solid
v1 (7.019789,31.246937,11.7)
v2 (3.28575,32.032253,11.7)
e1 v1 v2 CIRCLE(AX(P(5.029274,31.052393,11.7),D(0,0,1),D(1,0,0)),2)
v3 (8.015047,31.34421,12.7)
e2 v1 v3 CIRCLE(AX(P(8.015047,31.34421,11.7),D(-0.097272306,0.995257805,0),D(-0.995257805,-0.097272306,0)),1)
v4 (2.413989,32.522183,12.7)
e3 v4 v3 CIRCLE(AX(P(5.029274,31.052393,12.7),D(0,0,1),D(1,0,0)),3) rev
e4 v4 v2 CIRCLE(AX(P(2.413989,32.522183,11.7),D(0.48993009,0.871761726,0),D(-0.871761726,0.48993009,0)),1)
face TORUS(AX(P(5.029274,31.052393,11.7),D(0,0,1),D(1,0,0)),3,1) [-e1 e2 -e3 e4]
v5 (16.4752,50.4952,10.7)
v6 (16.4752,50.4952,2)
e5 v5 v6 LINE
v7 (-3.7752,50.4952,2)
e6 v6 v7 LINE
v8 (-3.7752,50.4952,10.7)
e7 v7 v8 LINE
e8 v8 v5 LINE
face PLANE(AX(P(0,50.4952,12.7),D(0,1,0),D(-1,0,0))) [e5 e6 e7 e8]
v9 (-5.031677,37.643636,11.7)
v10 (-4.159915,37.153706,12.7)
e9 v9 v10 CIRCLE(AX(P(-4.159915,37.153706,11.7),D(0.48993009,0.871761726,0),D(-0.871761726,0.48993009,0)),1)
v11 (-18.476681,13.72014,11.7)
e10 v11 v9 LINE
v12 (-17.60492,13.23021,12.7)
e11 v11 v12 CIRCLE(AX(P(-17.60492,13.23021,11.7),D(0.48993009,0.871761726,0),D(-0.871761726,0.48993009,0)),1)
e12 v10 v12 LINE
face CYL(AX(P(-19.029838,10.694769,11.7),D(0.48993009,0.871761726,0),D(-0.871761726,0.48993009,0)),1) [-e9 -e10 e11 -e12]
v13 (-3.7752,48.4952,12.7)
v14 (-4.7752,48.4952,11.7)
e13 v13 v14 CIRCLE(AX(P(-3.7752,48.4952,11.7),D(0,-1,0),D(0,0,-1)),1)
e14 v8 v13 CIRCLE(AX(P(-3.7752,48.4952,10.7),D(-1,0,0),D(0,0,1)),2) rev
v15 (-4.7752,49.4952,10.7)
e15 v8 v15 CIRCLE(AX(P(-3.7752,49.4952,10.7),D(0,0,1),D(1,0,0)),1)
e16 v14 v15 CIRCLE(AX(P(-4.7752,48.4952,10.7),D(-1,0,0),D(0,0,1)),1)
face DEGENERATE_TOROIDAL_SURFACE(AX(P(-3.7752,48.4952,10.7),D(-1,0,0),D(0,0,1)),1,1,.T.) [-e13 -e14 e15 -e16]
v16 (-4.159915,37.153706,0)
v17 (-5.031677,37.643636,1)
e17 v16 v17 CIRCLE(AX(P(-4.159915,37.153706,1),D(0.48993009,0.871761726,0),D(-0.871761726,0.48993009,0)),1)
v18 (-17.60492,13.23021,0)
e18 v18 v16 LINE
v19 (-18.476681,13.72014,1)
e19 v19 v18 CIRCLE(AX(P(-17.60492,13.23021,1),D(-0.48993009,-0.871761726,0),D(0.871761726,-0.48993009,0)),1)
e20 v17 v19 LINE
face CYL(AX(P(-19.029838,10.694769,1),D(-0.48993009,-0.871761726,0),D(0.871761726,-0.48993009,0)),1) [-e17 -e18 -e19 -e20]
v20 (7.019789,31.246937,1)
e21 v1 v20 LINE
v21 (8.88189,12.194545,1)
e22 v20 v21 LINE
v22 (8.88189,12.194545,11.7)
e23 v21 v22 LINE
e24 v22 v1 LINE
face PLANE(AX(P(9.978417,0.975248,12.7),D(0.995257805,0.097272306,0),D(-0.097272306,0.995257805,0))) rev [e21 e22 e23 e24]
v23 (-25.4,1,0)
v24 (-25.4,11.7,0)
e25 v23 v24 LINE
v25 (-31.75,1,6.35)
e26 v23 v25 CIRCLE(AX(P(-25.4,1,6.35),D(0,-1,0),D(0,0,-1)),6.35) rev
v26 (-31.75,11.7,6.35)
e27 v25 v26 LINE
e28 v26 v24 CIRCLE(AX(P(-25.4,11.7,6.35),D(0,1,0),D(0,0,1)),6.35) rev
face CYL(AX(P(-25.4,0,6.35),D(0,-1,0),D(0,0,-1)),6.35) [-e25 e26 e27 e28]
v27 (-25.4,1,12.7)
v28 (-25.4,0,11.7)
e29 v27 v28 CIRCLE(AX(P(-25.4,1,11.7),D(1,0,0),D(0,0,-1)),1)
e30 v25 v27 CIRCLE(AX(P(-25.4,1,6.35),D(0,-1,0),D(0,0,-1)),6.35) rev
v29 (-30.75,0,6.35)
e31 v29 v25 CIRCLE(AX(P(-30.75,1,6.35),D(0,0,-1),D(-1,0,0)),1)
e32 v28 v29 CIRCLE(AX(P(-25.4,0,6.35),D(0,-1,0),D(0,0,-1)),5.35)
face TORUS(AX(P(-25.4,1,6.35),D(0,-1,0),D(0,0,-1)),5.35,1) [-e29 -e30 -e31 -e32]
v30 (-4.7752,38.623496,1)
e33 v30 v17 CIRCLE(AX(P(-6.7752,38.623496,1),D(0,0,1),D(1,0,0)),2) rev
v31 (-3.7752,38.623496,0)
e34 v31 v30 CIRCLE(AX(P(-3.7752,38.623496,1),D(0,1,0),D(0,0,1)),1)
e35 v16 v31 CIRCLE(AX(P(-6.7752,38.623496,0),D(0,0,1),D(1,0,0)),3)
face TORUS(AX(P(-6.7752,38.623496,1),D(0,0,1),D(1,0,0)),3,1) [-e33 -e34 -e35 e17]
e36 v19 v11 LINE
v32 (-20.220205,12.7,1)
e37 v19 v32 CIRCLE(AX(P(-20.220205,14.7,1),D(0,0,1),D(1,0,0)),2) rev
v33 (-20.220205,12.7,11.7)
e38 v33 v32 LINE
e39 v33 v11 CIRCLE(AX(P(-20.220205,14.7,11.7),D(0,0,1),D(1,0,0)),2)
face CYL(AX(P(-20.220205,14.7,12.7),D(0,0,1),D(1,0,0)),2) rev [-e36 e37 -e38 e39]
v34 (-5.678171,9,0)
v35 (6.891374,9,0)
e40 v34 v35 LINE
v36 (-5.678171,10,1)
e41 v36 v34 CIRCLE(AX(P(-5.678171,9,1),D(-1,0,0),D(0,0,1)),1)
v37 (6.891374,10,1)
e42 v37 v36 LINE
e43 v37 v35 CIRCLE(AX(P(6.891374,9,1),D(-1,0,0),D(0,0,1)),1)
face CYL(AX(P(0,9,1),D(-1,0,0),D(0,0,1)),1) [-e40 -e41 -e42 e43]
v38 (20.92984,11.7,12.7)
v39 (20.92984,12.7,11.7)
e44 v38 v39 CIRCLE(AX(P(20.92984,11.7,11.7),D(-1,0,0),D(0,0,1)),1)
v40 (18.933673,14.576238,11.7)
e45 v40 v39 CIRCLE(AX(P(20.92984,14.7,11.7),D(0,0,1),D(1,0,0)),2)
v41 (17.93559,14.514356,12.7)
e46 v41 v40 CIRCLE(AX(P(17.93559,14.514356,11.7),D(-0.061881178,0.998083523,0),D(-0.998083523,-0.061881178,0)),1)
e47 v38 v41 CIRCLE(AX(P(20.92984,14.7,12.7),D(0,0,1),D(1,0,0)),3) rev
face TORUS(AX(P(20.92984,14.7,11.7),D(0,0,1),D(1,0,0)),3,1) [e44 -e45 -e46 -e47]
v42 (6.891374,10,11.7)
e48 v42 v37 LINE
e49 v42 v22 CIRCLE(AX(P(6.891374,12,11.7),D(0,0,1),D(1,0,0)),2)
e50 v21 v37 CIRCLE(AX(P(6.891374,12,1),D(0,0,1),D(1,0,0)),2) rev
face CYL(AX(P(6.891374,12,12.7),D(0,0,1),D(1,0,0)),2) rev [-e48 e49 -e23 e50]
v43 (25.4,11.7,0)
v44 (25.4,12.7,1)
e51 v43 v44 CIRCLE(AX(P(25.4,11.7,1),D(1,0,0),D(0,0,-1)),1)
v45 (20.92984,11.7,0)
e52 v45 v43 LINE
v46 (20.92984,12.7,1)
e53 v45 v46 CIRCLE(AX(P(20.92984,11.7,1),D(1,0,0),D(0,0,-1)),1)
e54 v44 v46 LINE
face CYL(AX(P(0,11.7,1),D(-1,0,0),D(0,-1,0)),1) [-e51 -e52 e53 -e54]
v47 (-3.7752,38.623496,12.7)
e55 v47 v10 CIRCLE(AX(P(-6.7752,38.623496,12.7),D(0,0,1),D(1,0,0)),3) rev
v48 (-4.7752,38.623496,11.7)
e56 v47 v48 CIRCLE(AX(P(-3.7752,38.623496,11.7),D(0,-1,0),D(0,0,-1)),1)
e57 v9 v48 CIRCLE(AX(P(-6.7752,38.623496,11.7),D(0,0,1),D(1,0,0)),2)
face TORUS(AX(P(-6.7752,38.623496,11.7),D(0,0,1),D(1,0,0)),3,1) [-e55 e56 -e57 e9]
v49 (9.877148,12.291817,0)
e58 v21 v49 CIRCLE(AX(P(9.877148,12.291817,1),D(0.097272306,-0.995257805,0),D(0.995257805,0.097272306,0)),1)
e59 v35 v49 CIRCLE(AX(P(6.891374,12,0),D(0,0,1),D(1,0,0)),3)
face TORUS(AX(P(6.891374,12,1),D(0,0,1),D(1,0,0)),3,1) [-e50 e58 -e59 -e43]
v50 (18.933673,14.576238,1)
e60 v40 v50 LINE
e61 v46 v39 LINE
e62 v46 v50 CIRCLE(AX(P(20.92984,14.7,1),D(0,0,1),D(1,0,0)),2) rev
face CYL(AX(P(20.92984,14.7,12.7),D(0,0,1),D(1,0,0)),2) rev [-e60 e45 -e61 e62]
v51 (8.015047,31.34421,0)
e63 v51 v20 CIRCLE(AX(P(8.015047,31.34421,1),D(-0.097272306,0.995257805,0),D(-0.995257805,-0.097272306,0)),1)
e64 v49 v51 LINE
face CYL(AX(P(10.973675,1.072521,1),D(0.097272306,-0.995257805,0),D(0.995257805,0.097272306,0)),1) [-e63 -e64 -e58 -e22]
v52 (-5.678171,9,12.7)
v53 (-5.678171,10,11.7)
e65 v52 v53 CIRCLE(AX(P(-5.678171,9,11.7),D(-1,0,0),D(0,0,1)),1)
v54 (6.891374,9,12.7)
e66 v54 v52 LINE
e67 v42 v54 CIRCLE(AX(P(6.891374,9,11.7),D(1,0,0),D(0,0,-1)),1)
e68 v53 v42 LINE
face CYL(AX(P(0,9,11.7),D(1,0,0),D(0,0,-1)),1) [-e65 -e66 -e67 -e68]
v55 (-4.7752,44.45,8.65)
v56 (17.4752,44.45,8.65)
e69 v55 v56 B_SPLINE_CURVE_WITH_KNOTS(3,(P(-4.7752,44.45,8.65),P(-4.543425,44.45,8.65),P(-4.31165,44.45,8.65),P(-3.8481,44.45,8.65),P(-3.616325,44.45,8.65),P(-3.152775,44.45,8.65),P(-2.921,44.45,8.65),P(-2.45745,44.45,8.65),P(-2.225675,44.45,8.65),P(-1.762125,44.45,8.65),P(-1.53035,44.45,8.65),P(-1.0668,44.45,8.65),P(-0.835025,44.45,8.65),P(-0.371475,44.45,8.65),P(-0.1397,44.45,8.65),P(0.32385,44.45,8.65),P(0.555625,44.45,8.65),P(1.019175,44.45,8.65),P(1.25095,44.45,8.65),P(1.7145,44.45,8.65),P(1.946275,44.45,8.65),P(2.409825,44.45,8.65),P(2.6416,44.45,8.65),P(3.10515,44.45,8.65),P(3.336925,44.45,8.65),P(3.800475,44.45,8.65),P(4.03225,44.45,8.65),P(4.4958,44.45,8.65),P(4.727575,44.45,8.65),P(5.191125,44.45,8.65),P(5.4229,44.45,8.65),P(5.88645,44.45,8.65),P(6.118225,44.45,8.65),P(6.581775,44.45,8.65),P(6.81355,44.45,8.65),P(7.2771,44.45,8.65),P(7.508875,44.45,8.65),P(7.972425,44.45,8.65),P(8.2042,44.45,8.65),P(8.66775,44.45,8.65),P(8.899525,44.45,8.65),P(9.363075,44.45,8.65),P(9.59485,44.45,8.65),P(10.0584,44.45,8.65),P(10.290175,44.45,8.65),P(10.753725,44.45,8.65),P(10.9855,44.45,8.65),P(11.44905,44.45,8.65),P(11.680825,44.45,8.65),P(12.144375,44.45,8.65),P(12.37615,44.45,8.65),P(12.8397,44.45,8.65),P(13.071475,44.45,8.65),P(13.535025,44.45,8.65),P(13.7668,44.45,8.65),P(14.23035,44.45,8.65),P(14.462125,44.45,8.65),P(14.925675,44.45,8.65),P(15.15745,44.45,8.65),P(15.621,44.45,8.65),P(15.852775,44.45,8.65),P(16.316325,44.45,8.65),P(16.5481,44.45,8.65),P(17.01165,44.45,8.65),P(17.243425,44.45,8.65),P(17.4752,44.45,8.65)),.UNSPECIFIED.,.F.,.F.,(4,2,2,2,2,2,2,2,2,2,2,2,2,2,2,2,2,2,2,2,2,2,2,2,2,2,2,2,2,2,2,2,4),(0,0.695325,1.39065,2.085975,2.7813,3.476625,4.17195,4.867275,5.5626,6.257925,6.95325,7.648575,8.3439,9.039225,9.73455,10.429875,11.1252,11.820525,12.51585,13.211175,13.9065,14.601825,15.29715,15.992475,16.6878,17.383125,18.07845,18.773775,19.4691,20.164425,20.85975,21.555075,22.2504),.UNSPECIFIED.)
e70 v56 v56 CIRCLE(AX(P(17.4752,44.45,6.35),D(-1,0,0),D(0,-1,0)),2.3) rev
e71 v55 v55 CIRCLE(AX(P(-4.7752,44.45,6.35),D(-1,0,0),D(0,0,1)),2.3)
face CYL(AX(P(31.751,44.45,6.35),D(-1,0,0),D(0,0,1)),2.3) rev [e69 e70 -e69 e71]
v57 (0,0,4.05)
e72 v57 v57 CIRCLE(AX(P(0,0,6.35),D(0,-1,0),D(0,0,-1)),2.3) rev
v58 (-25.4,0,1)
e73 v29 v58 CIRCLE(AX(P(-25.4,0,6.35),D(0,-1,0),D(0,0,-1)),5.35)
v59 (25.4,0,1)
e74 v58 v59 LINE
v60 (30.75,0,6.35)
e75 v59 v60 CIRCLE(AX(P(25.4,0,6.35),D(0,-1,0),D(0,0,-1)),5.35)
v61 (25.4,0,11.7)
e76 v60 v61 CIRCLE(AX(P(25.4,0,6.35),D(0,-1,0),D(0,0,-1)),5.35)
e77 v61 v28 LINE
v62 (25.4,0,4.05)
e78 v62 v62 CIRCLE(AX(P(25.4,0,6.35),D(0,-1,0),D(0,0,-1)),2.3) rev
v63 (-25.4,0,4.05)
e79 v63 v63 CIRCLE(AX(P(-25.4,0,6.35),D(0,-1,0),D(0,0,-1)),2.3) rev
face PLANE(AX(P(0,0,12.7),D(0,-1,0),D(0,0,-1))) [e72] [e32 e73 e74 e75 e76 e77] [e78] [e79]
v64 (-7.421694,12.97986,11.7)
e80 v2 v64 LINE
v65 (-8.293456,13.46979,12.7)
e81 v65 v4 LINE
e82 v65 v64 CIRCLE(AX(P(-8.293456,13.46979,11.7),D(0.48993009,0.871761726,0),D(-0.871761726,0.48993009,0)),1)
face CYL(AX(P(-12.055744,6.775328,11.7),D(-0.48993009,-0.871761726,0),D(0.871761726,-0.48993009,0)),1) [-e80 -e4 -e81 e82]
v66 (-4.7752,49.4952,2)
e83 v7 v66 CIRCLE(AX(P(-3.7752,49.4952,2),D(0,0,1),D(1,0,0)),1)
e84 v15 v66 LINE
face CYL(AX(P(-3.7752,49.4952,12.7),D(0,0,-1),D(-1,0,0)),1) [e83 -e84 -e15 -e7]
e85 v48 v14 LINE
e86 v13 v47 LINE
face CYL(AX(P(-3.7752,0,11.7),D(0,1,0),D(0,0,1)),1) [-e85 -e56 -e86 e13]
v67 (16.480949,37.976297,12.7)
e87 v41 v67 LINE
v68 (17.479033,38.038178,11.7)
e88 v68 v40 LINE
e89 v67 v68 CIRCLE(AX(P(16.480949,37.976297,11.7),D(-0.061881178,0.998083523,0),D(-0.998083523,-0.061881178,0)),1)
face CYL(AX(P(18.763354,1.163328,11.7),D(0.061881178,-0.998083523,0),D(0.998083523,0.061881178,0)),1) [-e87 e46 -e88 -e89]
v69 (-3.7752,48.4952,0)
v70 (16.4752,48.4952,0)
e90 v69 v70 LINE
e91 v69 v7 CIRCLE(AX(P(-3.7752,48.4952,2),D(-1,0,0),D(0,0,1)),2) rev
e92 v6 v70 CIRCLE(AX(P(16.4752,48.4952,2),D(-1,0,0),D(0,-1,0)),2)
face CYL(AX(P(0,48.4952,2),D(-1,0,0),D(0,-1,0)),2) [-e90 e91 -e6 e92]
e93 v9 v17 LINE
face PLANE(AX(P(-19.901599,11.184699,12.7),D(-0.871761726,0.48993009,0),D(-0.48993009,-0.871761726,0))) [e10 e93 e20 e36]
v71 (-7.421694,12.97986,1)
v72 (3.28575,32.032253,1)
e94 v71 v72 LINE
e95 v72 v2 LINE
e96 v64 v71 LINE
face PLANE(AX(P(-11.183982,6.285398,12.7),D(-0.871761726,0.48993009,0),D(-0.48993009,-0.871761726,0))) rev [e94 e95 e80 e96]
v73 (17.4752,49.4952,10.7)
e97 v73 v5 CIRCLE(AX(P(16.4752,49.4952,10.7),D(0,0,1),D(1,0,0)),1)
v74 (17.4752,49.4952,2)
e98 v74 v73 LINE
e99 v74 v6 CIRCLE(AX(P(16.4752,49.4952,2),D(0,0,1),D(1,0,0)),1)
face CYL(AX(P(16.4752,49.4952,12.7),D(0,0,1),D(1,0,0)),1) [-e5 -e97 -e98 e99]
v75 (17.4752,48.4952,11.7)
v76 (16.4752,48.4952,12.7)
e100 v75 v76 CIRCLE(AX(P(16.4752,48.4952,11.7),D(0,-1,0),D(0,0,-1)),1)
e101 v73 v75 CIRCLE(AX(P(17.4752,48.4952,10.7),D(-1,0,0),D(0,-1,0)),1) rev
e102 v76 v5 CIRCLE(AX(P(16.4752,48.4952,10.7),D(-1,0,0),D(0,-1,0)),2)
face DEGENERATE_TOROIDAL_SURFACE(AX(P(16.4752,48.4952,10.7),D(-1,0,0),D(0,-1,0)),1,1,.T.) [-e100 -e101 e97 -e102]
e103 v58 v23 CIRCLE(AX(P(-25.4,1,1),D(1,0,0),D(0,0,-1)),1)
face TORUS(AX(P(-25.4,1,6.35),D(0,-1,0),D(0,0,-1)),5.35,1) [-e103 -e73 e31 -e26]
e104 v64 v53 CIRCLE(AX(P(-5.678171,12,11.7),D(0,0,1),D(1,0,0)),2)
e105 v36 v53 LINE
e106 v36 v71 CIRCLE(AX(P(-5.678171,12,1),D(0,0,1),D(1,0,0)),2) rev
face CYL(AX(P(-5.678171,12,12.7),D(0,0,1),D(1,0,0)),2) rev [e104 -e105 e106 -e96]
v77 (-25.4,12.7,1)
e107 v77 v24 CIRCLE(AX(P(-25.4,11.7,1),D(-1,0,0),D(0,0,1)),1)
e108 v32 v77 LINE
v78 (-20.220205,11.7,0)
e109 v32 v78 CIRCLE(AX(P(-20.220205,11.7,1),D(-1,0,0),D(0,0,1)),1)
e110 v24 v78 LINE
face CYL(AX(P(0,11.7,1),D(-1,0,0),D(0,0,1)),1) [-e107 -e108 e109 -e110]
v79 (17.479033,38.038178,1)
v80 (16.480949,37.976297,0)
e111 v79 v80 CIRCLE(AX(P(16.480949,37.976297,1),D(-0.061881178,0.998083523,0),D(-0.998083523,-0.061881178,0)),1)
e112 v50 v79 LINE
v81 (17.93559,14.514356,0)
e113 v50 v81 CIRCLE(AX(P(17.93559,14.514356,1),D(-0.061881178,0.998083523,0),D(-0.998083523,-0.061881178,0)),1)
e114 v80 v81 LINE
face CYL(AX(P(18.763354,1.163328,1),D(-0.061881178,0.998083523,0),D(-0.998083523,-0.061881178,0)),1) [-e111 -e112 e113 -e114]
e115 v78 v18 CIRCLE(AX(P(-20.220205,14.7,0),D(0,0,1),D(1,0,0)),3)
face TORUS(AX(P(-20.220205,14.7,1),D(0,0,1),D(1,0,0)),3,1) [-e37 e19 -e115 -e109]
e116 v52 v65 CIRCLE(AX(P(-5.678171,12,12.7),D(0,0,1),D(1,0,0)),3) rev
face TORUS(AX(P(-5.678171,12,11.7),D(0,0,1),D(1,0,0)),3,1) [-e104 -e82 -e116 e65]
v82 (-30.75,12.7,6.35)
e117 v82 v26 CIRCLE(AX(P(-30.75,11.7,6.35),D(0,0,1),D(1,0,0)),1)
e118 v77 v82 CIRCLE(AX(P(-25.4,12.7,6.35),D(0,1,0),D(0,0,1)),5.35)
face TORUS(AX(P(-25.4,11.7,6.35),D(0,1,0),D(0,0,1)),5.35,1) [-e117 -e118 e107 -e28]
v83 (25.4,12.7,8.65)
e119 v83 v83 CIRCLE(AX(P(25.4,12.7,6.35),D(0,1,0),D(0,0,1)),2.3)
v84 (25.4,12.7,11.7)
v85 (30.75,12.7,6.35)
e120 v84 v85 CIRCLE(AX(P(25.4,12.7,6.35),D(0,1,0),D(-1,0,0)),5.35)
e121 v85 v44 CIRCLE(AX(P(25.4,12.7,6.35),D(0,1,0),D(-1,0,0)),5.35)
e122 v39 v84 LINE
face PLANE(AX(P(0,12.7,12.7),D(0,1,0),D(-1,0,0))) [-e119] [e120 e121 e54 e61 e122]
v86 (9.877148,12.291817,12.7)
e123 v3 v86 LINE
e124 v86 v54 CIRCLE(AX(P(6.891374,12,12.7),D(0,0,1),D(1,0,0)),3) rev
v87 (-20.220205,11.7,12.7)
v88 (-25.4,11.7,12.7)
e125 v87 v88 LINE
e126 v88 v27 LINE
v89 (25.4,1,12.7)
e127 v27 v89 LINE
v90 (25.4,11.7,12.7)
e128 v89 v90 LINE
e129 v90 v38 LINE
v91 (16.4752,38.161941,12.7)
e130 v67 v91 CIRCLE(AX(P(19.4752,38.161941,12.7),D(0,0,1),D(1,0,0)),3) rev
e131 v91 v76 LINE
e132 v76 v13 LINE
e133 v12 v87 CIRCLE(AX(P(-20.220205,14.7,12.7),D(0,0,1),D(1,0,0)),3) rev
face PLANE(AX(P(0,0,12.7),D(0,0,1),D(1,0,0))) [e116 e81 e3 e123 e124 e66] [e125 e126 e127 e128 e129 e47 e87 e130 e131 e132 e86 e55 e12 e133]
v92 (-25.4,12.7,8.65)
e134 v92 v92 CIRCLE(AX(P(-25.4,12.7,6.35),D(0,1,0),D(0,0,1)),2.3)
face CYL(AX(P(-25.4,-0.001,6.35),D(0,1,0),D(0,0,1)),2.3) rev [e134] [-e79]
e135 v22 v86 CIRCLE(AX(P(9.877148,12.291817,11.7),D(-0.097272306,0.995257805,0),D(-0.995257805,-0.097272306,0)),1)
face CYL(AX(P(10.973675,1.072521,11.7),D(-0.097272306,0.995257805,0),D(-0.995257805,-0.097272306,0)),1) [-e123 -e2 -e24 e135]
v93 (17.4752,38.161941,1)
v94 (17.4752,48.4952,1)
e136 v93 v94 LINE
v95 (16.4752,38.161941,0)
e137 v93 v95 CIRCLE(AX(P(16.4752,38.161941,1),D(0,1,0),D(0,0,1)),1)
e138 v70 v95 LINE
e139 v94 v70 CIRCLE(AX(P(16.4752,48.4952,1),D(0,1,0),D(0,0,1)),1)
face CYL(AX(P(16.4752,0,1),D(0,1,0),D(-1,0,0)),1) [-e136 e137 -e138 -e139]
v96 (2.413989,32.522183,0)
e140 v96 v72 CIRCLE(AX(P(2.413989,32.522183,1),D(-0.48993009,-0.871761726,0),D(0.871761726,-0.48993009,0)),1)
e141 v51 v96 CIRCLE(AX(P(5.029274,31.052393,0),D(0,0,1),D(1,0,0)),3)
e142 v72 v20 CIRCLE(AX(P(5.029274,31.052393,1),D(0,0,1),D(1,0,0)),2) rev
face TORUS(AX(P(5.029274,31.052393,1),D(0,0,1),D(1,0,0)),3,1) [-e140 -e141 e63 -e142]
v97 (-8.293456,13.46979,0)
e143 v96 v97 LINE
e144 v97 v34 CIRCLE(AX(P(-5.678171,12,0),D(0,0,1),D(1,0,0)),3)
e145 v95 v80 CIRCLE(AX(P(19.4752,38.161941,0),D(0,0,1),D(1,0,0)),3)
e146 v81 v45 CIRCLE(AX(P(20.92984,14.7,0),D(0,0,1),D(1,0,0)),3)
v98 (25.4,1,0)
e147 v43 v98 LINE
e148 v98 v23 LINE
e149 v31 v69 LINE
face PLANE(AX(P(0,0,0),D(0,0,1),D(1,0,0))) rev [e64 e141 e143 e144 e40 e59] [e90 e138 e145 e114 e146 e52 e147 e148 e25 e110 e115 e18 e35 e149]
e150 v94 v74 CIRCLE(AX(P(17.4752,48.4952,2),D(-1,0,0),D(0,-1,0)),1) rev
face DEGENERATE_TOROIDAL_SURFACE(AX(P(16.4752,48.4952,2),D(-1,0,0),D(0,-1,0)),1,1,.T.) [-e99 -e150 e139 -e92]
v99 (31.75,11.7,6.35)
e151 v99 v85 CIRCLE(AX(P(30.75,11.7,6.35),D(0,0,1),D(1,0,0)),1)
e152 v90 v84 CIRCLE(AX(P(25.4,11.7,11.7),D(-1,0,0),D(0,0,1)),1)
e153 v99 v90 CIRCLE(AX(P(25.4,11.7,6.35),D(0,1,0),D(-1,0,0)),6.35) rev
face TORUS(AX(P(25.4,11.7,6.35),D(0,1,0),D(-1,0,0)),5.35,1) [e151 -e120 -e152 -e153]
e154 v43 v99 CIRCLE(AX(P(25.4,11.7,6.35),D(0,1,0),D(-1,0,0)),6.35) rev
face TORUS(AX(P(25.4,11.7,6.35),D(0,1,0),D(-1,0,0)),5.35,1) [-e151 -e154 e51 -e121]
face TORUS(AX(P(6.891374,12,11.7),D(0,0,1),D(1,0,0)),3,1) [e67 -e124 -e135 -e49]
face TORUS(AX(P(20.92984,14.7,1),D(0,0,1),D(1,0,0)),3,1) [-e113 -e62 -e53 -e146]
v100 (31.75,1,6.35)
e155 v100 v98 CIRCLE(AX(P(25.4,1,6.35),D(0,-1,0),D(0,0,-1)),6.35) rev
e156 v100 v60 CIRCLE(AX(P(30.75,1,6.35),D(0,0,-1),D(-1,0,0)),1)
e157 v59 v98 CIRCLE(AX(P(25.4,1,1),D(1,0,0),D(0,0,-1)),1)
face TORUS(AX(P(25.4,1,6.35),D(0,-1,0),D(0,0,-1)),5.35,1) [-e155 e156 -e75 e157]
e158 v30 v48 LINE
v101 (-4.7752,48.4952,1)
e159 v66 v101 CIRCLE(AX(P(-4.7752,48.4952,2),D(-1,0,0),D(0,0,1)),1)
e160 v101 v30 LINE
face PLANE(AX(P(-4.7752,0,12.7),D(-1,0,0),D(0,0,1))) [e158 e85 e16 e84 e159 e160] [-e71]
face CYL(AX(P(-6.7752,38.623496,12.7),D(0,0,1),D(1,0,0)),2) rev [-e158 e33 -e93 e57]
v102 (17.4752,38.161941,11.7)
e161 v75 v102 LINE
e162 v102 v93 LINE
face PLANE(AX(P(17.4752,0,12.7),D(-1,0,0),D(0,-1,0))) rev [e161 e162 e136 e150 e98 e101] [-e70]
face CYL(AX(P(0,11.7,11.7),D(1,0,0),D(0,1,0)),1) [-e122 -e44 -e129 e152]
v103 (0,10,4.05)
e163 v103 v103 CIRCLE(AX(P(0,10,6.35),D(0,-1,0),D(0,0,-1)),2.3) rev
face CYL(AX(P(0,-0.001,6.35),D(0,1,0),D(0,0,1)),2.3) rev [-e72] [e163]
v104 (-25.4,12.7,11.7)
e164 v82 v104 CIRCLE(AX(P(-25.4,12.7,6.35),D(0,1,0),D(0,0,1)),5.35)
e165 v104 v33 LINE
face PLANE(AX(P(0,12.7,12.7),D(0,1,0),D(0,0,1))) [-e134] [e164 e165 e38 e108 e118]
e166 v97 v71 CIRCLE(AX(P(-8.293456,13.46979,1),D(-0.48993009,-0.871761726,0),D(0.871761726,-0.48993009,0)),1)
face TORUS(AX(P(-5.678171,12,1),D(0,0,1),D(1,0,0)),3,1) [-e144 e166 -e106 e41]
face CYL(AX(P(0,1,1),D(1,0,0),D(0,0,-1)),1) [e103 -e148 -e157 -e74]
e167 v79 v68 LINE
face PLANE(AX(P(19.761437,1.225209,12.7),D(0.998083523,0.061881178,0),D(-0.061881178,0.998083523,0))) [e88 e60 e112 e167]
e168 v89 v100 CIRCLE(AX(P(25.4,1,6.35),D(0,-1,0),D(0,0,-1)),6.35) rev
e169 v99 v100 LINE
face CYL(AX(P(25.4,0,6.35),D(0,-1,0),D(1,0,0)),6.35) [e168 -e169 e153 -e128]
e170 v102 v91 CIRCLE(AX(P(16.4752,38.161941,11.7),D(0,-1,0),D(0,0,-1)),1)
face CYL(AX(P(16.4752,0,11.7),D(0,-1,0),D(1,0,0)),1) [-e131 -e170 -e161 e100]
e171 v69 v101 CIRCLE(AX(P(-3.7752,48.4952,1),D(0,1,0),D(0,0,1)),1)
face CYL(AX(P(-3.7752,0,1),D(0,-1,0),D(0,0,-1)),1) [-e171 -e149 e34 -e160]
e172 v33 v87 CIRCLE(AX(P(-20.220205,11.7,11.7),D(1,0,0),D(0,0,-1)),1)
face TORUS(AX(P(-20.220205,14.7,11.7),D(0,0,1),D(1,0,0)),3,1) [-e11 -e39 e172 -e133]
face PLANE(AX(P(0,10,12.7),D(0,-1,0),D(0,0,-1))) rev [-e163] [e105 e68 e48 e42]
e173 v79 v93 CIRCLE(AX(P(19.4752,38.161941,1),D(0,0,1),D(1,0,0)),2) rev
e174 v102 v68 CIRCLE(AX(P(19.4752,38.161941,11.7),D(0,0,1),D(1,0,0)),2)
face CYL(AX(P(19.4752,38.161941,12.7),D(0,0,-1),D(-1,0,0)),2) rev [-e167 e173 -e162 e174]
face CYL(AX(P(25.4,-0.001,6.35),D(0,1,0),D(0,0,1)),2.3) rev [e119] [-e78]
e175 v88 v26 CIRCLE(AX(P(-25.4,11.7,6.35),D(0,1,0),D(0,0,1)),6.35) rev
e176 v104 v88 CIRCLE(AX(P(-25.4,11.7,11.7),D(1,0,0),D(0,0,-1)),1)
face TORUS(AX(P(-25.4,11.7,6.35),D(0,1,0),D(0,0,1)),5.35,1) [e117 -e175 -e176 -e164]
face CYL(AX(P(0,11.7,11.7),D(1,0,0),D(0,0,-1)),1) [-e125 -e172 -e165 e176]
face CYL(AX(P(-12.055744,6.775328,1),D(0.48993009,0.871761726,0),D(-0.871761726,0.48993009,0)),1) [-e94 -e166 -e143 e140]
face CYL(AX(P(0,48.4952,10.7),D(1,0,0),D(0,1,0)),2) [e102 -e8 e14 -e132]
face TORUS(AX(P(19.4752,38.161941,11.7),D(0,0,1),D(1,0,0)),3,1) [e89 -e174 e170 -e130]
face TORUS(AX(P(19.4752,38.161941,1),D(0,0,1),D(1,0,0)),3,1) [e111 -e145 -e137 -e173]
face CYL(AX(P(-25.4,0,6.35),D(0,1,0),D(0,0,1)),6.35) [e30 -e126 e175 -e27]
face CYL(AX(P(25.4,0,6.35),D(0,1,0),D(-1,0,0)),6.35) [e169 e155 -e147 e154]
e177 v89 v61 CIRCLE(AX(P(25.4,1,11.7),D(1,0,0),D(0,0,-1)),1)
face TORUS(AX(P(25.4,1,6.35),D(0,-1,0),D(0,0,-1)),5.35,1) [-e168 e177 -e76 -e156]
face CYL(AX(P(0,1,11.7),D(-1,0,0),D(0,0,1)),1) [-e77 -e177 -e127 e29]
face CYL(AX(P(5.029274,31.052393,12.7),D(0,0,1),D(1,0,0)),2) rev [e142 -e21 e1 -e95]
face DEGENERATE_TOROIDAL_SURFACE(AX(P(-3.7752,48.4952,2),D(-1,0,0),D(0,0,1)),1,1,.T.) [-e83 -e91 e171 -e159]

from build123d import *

# Parameters (mm, degrees)
SKETCH1_W           = 6.35
SKETCH1_H           = 12.7
SKETCH1_W_2         = 22.2504
SKETCH1_H_2         = 12.3952
BOSS_EXTRUDE1_DEPTH = 12.7
CUT_EXTRUDE1_REACH  = 52.969
SKETCH2_R           = 2.3
CUT_EXTRUDE2_REACH  = 65.601
SKETCH3_R           = 2.3
FILLET1_R           = 6.35
FILLET2_R           = 2
FILLET3_R           = 1


# Some blends are built 0.0001 mm under size
with BuildPart() as part:
    # Sketch1 → Boss-Extrude1 (new body)
    # profile 1 of 3: a face of its own
    with BuildSketch(Plane.XY):
        Polygon((-31.75, 0), (25.4, 0), (25.4, 12.7), (19.05, 12.7), (17.4752, 38.1), (-4.7752, 38.1), (-19.05, 12.7), (-31.75, 12.7), align=None)
        Polygon((9.096375634, 10), (-9.096375634, 10), (6.401231747, 37.575813845), align=None, mode=Mode.SUBTRACT)
    # profile 2 of 3: a face of its own
    with BuildSketch(Plane.XY):
        with Locations((28.575, 6.35)):
            Rectangle(SKETCH1_W, SKETCH1_H)
    # profile 3 of 3: a face of its own
    with BuildSketch(Plane.XY):
        with Locations((6.35, 44.2976)):
            Rectangle(SKETCH1_W_2, SKETCH1_H_2)
    extrude(amount=BOSS_EXTRUDE1_DEPTH)

    # Sketch2 → Cut-Extrude1 (cut, up to next)
    with BuildSketch(Plane(origin=(0, 12.7, 0), x_dir=(1, 0, 0), z_dir=(0, 1, 0)), mode=Mode.PRIVATE) as cut_extrude1_sk1:
        with Locations(Location((-25.4, -6.35, 0), (0, 0, 270))):
            Circle(SKETCH2_R)
    cut_extrude1_tool1 = extrude(cut_extrude1_sk1.sketch, amount=-CUT_EXTRUDE1_REACH, mode=Mode.PRIVATE) & part.part
    # Sketch2 → Cut-Extrude1 (cut, up to next)
    with BuildSketch(Plane(origin=(0, 12.7, 0), x_dir=(1, 0, 0), z_dir=(0, 1, 0)), mode=Mode.PRIVATE) as cut_extrude1_sk2:
        with Locations(Location((25.4, -6.35, 0), (0, 0, 270))):
            Circle(SKETCH2_R)
    cut_extrude1_tool2 = extrude(cut_extrude1_sk2.sketch, amount=-CUT_EXTRUDE1_REACH, mode=Mode.PRIVATE) & part.part
    # Sketch2 → Cut-Extrude1 (cut, up to next)
    with BuildSketch(Plane(origin=(0, 12.7, 0), x_dir=(1, 0, 0), z_dir=(0, 1, 0)), mode=Mode.PRIVATE) as cut_extrude1_sk3:
        with Locations(Location((0, -6.35, 0), (0, 0, 90))):
            Circle(SKETCH2_R)
    cut_extrude1_tool3 = extrude(cut_extrude1_sk3.sketch, amount=-CUT_EXTRUDE1_REACH, mode=Mode.PRIVATE) & part.part
    add(cut_extrude1_tool1.solids().sort_by_distance((-25.4, 12.7, 6.35))[0], mode=Mode.SUBTRACT)
    add(cut_extrude1_tool2.solids().sort_by_distance((25.4, 12.7, 6.35))[0], mode=Mode.SUBTRACT)
    add(cut_extrude1_tool3.solids().sort_by_distance((0, 12.7, 6.35))[0], mode=Mode.SUBTRACT)

    # Sketch3 → Cut-Extrude2 (cut, up to next)
    with BuildSketch(Plane.ZY.offset(4.7752), mode=Mode.PRIVATE) as cut_extrude2_sk1:
        with Locations((6.35, 44.45)):
            Circle(SKETCH3_R)
    cut_extrude2_tool1 = extrude(cut_extrude2_sk1.sketch, amount=-CUT_EXTRUDE2_REACH, mode=Mode.PRIVATE) & part.part
    add(cut_extrude2_tool1.solids().sort_by_distance((-4.7752, 44.45, 6.35))[0], mode=Mode.SUBTRACT)

    # Fillet1
    fillet1_edges = [part.edges().sort_by_distance(p)[0] for p in [
        (31.75, 6.35, 0),
        (31.75, 6.35, 12.7),
        (-31.75, 6.35, 0),
        (-31.75, 6.35, 12.7),
    ]]
    fillet(fillet1_edges, radius=FILLET1_R - 0.0001)  # a hair under: the kernel refuses the full size

    # Fillet2
    fillet2_edges = [part.edges().sort_by_distance(p)[0] for p in [
        (6.35, 50.4952, 0),
        (6.401231747, 37.575813845, 6.35),
        (-9.096375634, 10, 6.35),
        (9.096375634, 10, 6.35),
        (-19.05, 12.7, 6.35),
        (-4.7752, 38.1, 6.35),
        (17.4752, 38.1, 6.35),
        (19.05, 12.7, 6.35),
        (6.35, 50.4952, 12.7),
    ]]
    fillet(fillet2_edges, radius=FILLET2_R)

    # Fillet3
    # the kernel refuses this fillet: 1 mm, written as the material it adds along each edge
    with BuildSketch(Plane(origin=(17.4752, 38.1, 0), x_dir=(0, 1, 0), z_dir=(0, 0, 1))) as fillet3_piece_1:
        with BuildLine():
            CenterArc((FILLET3_R * 0.0309702661211, -FILLET3_R), FILLET3_R, 90, 3.54779707)
            Line((-FILLET3_R * 0.0309109123319, -FILLET3_R * 0.00191647656458), (0, 0))
            Line((0, 0), (FILLET3_R * 0.0309702661211, 0))
        make_face()
    extrude(amount=12.7)
    # the kernel refuses this fillet: 1 mm, written as the material it takes off along each edge
    with BuildSketch(Plane(origin=(-20.220204873, 12.7, 0), x_dir=(0, -1, 0), z_dir=(-1, 0, 0)), Plane(origin=(-20.220204873, 12.7, 12.7), x_dir=(0, 0, -1), z_dir=(-1, 0, 0))) as fillet3_2_piece_1:
        with BuildLine():
            CenterArc((FILLET3_R, FILLET3_R), FILLET3_R, 180, 90)
            Line((0, FILLET3_R), (0, 0))
            Line((0, 0), (FILLET3_R, 0))
        make_face()
    extrude(amount=5.179895127, mode=Mode.SUBTRACT)
    with BuildSketch(Plane(origin=(-20.220204873, 14.7, 0), x_dir=(0, -1, 0), z_dir=(-1, 0, 0))) as fillet3_2_piece_2:
        with BuildLine():
            CenterArc((2 + FILLET3_R, FILLET3_R), FILLET3_R, 180, 90)
            Line((2, FILLET3_R), (2, 0))
            Line((2, 0), (2 + FILLET3_R, 0))
        make_face()
    revolve(axis=Axis((-20.220204873, 14.7, 0), (0, 0, 1)), revolution_arc=60.664013302, mode=Mode.SUBTRACT)
    with BuildSketch(Plane(origin=(-5.031676548, 37.643636036, 0), x_dir=(0.8717617259923001, -0.48993009000767246, 0), z_dir=(-0.48993009000767246, -0.8717617259923001, 0)), Plane(origin=(-5.031676548, 37.643636036, 12.7), x_dir=(0, 0, -1), z_dir=(-0.48993009000767246, -0.8717617259923001, 0))) as fillet3_2_piece_3:
        with BuildLine():
            CenterArc((FILLET3_R, FILLET3_R), FILLET3_R, 180, 90)
            Line((0, FILLET3_R), (0, 0))
            Line((0, 0), (FILLET3_R, 0))
        make_face()
    extrude(amount=27.4427008, mode=Mode.SUBTRACT)
    with BuildSketch(Plane(origin=(-25.4001, 0, 0), x_dir=(0, 1, 0), z_dir=(1, 0, 0))) as fillet3_2_piece_4:
        with BuildLine():
            CenterArc((FILLET3_R, FILLET3_R), FILLET3_R, 180, 90)
            Line((0, FILLET3_R), (0, 0))
            Line((0, 0), (FILLET3_R, 0))
        make_face()
    extrude(amount=50.8002, mode=Mode.SUBTRACT)
    with BuildSketch(Plane(origin=(-6.7752, 38.623496216, 0), x_dir=(0.8717617259923004, -0.4899300900076718, 0), z_dir=(-0.4899300900076718, -0.8717617259923004, 0))) as fillet3_2_piece_5:
        with BuildLine():
            CenterArc((2 + FILLET3_R, FILLET3_R), FILLET3_R, 180, 90)
            Line((2, FILLET3_R), (2, 0))
            Line((2, 0), (2 + FILLET3_R, 0))
        make_face()
    revolve(axis=Axis((-6.7752, 38.623496216, 0), (0, 0, 1)), revolution_arc=29.335986698, mode=Mode.SUBTRACT)
    with BuildSketch(Plane(origin=(-4.7752, 48.4952, 0), x_dir=(1, 0, 0), z_dir=(0, -1, 0)), Plane(origin=(-4.7752, 48.4952, 12.7), x_dir=(0, 0, -1), z_dir=(0, -1, 0))) as fillet3_2_piece_6:
        with BuildLine():
            CenterArc((FILLET3_R, FILLET3_R), FILLET3_R, 180, 90)
            Line((0, FILLET3_R), (0, 0))
            Line((0, 0), (FILLET3_R, 0))
        make_face()
    extrude(amount=9.871703784, mode=Mode.SUBTRACT)
    with BuildSketch(Plane(origin=(6.891374478, 10, 0), x_dir=(0, -1, 0), z_dir=(-1, 0, 0)), Plane(origin=(6.891374478, 10, 12.7), x_dir=(0, 0, -1), z_dir=(-1, 0, 0))) as fillet3_2_piece_7:
        with BuildLine():
            CenterArc((FILLET3_R, FILLET3_R), FILLET3_R, 180, 90)
            Line((0, FILLET3_R), (0, 0))
            Line((0, 0), (FILLET3_R, 0))
        make_face()
    extrude(amount=12.569545239, mode=Mode.SUBTRACT)
    with BuildSketch(Plane(origin=(6.891374478, 12, 0), x_dir=(0, -1, 0), z_dir=(-1, 0, 0))) as fillet3_2_piece_8:
        with BuildLine():
            CenterArc((2 + FILLET3_R, FILLET3_R), FILLET3_R, 180, 90)
            Line((2, FILLET3_R), (2, 0))
            Line((2, 0), (2 + FILLET3_R, 0))
        make_face()
    revolve(axis=Axis((6.891374478, 12, 0), (0, 0, 1)), revolution_arc=95.582119196, mode=Mode.SUBTRACT)
    with BuildSketch(Plane(origin=(-5.678170761, 12, 0), x_dir=(0, -1, 0), z_dir=(1, 0, 0))) as fillet3_2_piece_9:
        with BuildLine():
            CenterArc((2 + FILLET3_R, -FILLET3_R), FILLET3_R, 90, 90)
            Line((2, -FILLET3_R), (2, 0))
            Line((2, 0), (2 + FILLET3_R, 0))
        make_face()
    revolve(axis=Axis((-5.678170761, 12, 0), (0, 0, -1)), revolution_arc=119.335986698, mode=Mode.SUBTRACT)
    with BuildSketch(Plane(origin=(7.01978949, 31.24693721, 0), x_dir=(0.9952578050812044, 0.0972723055393634, 0), z_dir=(0.0972723055393634, -0.9952578050812044, 0)), Plane(origin=(7.01978949, 31.24693721, 12.7), x_dir=(0, 0, -1), z_dir=(0.0972723055393634, -0.9952578050812044, 0))) as fillet3_2_piece_10:
        with BuildLine():
            CenterArc((FILLET3_R, FILLET3_R), FILLET3_R, 180, 90)
            Line((0, FILLET3_R), (0, 0))
            Line((0, 0), (FILLET3_R, 0))
        make_face()
    extrude(amount=19.143173258, mode=Mode.SUBTRACT)
    with BuildSketch(Plane(origin=(-7.421694213, 12.97986018, 0), x_dir=(-0.8717617259923001, 0.48993009000767257, 0), z_dir=(0.48993009000767257, 0.8717617259923001, 0)), Plane(origin=(-7.421694213, 12.97986018, 12.7), x_dir=(0, 0, -1), z_dir=(0.48993009000767257, 0.8717617259923001, 0))) as fillet3_2_piece_11:
        with BuildLine():
            CenterArc((FILLET3_R, FILLET3_R), FILLET3_R, 180, 90)
            Line((0, FILLET3_R), (0, 0))
            Line((0, 0), (FILLET3_R, 0))
        make_face()
    extrude(amount=21.855045973, mode=Mode.SUBTRACT)
    with BuildSketch(Plane(origin=(5.02927388, 31.052392599, 0), x_dir=(-0.8717617259923004, 0.4899300900076719, 0), z_dir=(-0.4899300900076719, -0.8717617259923004, 0))) as fillet3_2_piece_12:
        with BuildLine():
            CenterArc((2 + FILLET3_R, -FILLET3_R), FILLET3_R, 90, 90)
            Line((2, -FILLET3_R), (2, 0))
            Line((2, 0), (2 + FILLET3_R, 0))
        make_face()
    revolve(axis=Axis((5.02927388, 31.052392599, 0), (0, 0, -1)), revolution_arc=145.081894106, mode=Mode.SUBTRACT)
    with BuildSketch(Plane(origin=(-25.4001, 12.7, 6.3499), x_dir=(-1, 0, 0), z_dir=(0, 0, 1))) as fillet3_2_piece_13:
        with BuildLine():
            CenterArc((6.3499 - FILLET3_R, FILLET3_R), FILLET3_R, 270, 90)
            Line((6.3499, FILLET3_R), (6.3499, 0))
            Line((6.3499, 0), (6.3499 - FILLET3_R, 0))
        make_face()
    revolve(axis=Axis((-25.4001, 12.7, 6.3499), (0, -1, 0)), revolution_arc=90, mode=Mode.SUBTRACT)
    with BuildSketch(Plane(origin=(-31.75, 12.7, 6.3499), x_dir=(1, 0, 0), z_dir=(0, 0, 1)), Plane(origin=(31.75, 0, 6.3499), x_dir=(-1, 0, 0), z_dir=(0, 0, 1))) as fillet3_2_piece_14:
        with BuildLine():
            CenterArc((FILLET3_R, -FILLET3_R), FILLET3_R, 90, 90)
            Line((0, -FILLET3_R), (0, 0))
            Line((0, 0), (FILLET3_R, 0))
        make_face()
    extrude(amount=0.0002, mode=Mode.SUBTRACT)
    with BuildSketch(Plane(origin=(-25.4001, 12.7, 6.3501), x_dir=(-1, 0, 0), z_dir=(0, 0, -1))) as fillet3_2_piece_15:
        with BuildLine():
            CenterArc((6.3499 - FILLET3_R, -FILLET3_R), FILLET3_R, 0, 90)
            Line((6.3499, -FILLET3_R), (6.3499, 0))
            Line((6.3499, 0), (6.3499 - FILLET3_R, 0))
        make_face()
    revolve(axis=Axis((-25.4001, 12.7, 6.3501), (0, 1, 0)), revolution_arc=90, mode=Mode.SUBTRACT)
    with BuildSketch(Plane(origin=(-20.220204873, 14.7, 12.7), x_dir=(0, -1, 0), z_dir=(-1, 0, 0))) as fillet3_2_piece_16:
        with BuildLine():
            CenterArc((2 + FILLET3_R, -FILLET3_R), FILLET3_R, 90, 90)
            Line((2 + FILLET3_R, 0), (2, 0))
            Line((2, 0), (2, -FILLET3_R))
        make_face()
    revolve(axis=Axis((-20.220204873, 14.7, 12.7), (0, 0, 1)), revolution_arc=60.664013302, mode=Mode.SUBTRACT)
    with BuildSketch(Plane(origin=(-25.4001, 0, 6.3499), x_dir=(-1, 0, 0), z_dir=(0, 0, 1))) as fillet3_2_piece_17:
        with BuildLine():
            CenterArc((6.3499 - FILLET3_R, -FILLET3_R), FILLET3_R, 0, 90)
            Line((6.3499 - FILLET3_R, 0), (6.3499, 0))
            Line((6.3499, 0), (6.3499, -FILLET3_R))
        make_face()
    revolve(axis=Axis((-25.4001, 0, 6.3499), (0, -1, 0)), revolution_arc=90, mode=Mode.SUBTRACT)
    with BuildSketch(Plane(origin=(-31.75, 0, 6.3499), x_dir=(1, 0, 0), z_dir=(0, 0, 1))) as fillet3_2_piece_18:
        with BuildLine():
            CenterArc((FILLET3_R, FILLET3_R), FILLET3_R, 180, 90)
            Line((0, FILLET3_R), (0, 0))
            Line((0, 0), (FILLET3_R, 0))
        make_face()
    extrude(amount=0.0002, mode=Mode.SUBTRACT)
    with BuildSketch(Plane(origin=(-25.4001, 0, 6.3501), x_dir=(-1, 0, 0), z_dir=(0, 0, -1))) as fillet3_2_piece_19:
        with BuildLine():
            CenterArc((6.3499 - FILLET3_R, FILLET3_R), FILLET3_R, 270, 90)
            Line((6.3499, FILLET3_R), (6.3499, 0))
            Line((6.3499, 0), (6.3499 - FILLET3_R, 0))
        make_face()
    revolve(axis=Axis((-25.4001, 0, 6.3501), (0, 1, 0)), revolution_arc=90, mode=Mode.SUBTRACT)
    with BuildSketch(Plane(origin=(25.4001, 0, 12.7), x_dir=(0, 0, -1), z_dir=(-1, 0, 0))) as fillet3_2_piece_20:
        with BuildLine():
            CenterArc((FILLET3_R, -FILLET3_R), FILLET3_R, 90, 90)
            Line((0, -FILLET3_R), (0, 0))
            Line((0, 0), (FILLET3_R, 0))
        make_face()
    extrude(amount=50.8002, mode=Mode.SUBTRACT)
    with BuildSketch(Plane(origin=(25.4001, 0, 6.3499), x_dir=(0, 0, -1), z_dir=(-1, 0, 0))) as fillet3_2_piece_21:
        with BuildLine():
            CenterArc((6.3499 - FILLET3_R, -FILLET3_R), FILLET3_R, 0, 90)
            Line((6.3499, -FILLET3_R), (6.3499, 0))
            Line((6.3499, 0), (6.3499 - FILLET3_R, 0))
        make_face()
    revolve(axis=Axis((25.4001, 0, 6.3499), (0, -1, 0)), revolution_arc=90, mode=Mode.SUBTRACT)
    with BuildSketch(Plane(origin=(25.4001, 0, 6.3501), x_dir=(0, 0, 1), z_dir=(-1, 0, 0))) as fillet3_2_piece_22:
        with BuildLine():
            CenterArc((6.3499 - FILLET3_R, FILLET3_R), FILLET3_R, 270, 90)
            Line((6.3499, FILLET3_R), (6.3499, 0))
            Line((6.3499, 0), (6.3499 - FILLET3_R, 0))
        make_face()
    revolve(axis=Axis((25.4001, 0, 6.3501), (0, 1, 0)), revolution_arc=90, mode=Mode.SUBTRACT)
    with BuildSketch(Plane(origin=(-6.7752, 38.623496216, 12.7), x_dir=(0.8717617259923004, -0.4899300900076718, 0), z_dir=(-0.4899300900076718, -0.8717617259923004, 0))) as fillet3_2_piece_23:
        with BuildLine():
            CenterArc((2 + FILLET3_R, -FILLET3_R), FILLET3_R, 90, 90)
            Line((2 + FILLET3_R, 0), (2, 0))
            Line((2, 0), (2, -FILLET3_R))
        make_face()
    revolve(axis=Axis((-6.7752, 38.623496216, 12.7), (0, 0, 1)), revolution_arc=29.335986698, mode=Mode.SUBTRACT)
    with BuildSketch(Plane(origin=(-4.7752, 50.4952, 2), x_dir=(0, -1, 0), z_dir=(0, 0, 1))) as fillet3_2_piece_24:
        with BuildLine():
            CenterArc((FILLET3_R, FILLET3_R), FILLET3_R, 180, 90)
            Line((0, FILLET3_R), (0, 0))
            Line((0, 0), (FILLET3_R, 0))
        make_face()
    extrude(amount=8.7, mode=Mode.SUBTRACT)
    with BuildSketch(Plane(origin=(-4.7752, 48.4952, 2), x_dir=(0, 0, -1), z_dir=(0, -1, 0))) as fillet3_2_piece_25:
        with BuildLine():
            CenterArc((2 - FILLET3_R, FILLET3_R), FILLET3_R, 270, 90)
            Line((2, FILLET3_R), (2, 0))
            Line((2, 0), (2 - FILLET3_R, 0))
        make_face()
    revolve(axis=Axis((-4.7752, 48.4952, 2), (1, 0, 0)), revolution_arc=90, mode=Mode.SUBTRACT)
    with BuildSketch(Plane(origin=(-4.7752, 48.4952, 10.7), x_dir=(0, 0, 1), z_dir=(0, -1, 0))) as fillet3_2_piece_26:
        with BuildLine():
            CenterArc((2 - FILLET3_R, -FILLET3_R), FILLET3_R, 0, 90)
            Line((2, -FILLET3_R), (2, 0))
            Line((2, 0), (2 - FILLET3_R, 0))
        make_face()
    revolve(axis=Axis((-4.7752, 48.4952, 10.7), (-1, 0, 0)), revolution_arc=90, mode=Mode.SUBTRACT)
    with BuildSketch(Plane(origin=(6.891374478, 12, 12.7), x_dir=(0, -1, 0), z_dir=(-1, 0, 0))) as fillet3_2_piece_27:
        with BuildLine():
            CenterArc((2 + FILLET3_R, -FILLET3_R), FILLET3_R, 90, 90)
            Line((2 + FILLET3_R, 0), (2, 0))
            Line((2, 0), (2, -FILLET3_R))
        make_face()
    revolve(axis=Axis((6.891374478, 12, 12.7), (0, 0, 1)), revolution_arc=95.582119196, mode=Mode.SUBTRACT)
    with BuildSketch(Plane(origin=(-5.678170761, 12, 12.7), x_dir=(0, -1, 0), z_dir=(1, 0, 0))) as fillet3_2_piece_28:
        with BuildLine():
            CenterArc((2 + FILLET3_R, FILLET3_R), FILLET3_R, 180, 90)
            Line((2 + FILLET3_R, 0), (2, 0))
            Line((2, 0), (2, FILLET3_R))
        make_face()
    revolve(axis=Axis((-5.678170761, 12, 12.7), (0, 0, -1)), revolution_arc=119.335986698, mode=Mode.SUBTRACT)
    with BuildSketch(Plane(origin=(5.02927388, 31.052392599, 12.7), x_dir=(-0.8717617259923004, 0.4899300900076719, 0), z_dir=(-0.4899300900076719, -0.8717617259923004, 0))) as fillet3_2_piece_29:
        with BuildLine():
            CenterArc((2 + FILLET3_R, FILLET3_R), FILLET3_R, 180, 90)
            Line((2 + FILLET3_R, 0), (2, 0))
            Line((2, 0), (2, FILLET3_R))
        make_face()
    revolve(axis=Axis((5.02927388, 31.052392599, 12.7), (0, 0, -1)), revolution_arc=145.081894106, mode=Mode.SUBTRACT)
    # the kernel refuses this fillet: 1 mm, written as the material it takes off along each edge
    with BuildSketch(Plane(origin=(20.929840313, 12.7, 0), x_dir=(0, -1, 0), z_dir=(1, 0, 0))) as fillet3_3_piece_1:
        with BuildLine():
            CenterArc((FILLET3_R, -FILLET3_R), FILLET3_R, 90, 90)
            Line((0, -FILLET3_R), (0, 0))
            Line((0, 0), (FILLET3_R, 0))
        make_face()
    extrude(amount=4.470259687, mode=Mode.SUBTRACT)
    with BuildSketch(Plane(origin=(20.929840313, 14.7, 0), x_dir=(0, -1, 0), z_dir=(1, 0, 0))) as fillet3_3_piece_2:
        with BuildLine():
            CenterArc((2 + FILLET3_R, -FILLET3_R), FILLET3_R, 90, 90)
            Line((2, -FILLET3_R), (2, 0))
            Line((2, 0), (2 + FILLET3_R, 0))
        make_face()
    revolve(axis=Axis((20.929840313, 14.7, 0), (0, 0, -1)), revolution_arc=86.45220293, mode=Mode.SUBTRACT)
    with BuildSketch(Plane(origin=(17.4752, 38.130970266, 0), x_dir=(-1, 0, 0), z_dir=(0, 1, 0)), Plane(origin=(17.4752, 38.130970266, 12.7), x_dir=(0, 0, -1), z_dir=(0, 1, 0))) as fillet3_3_piece_3:
        with BuildLine():
            CenterArc((FILLET3_R, FILLET3_R), FILLET3_R, 180, 90)
            Line((0, FILLET3_R), (0, 0))
            Line((0, 0), (FILLET3_R, 0))
        make_face()
    extrude(amount=10.364229734, mode=Mode.SUBTRACT)
    with BuildSketch(Plane(origin=(18.933673266, 14.576237643, 0), x_dir=(-0.998083523435423, -0.06188117845299633, 0), z_dir=(-0.06188117845299633, 0.998083523435423, 0)), Plane(origin=(18.933673266, 14.576237643, 12.7), x_dir=(0, 0, -1), z_dir=(-0.06188117845299633, 0.998083523435423, 0))) as fillet3_3_piece_4:
        with BuildLine():
            CenterArc((FILLET3_R, FILLET3_R), FILLET3_R, 180, 90)
            Line((0, FILLET3_R), (0, 0))
            Line((0, 0), (FILLET3_R, 0))
        make_face()
    extrude(amount=23.537961396, mode=Mode.SUBTRACT)
    with BuildSketch(Plane(origin=(25.4001, 12.7, 6.3499), x_dir=(0, 0, -1), z_dir=(-1, 0, 0))) as fillet3_3_piece_5:
        with BuildLine():
            CenterArc((6.3499 - FILLET3_R, FILLET3_R), FILLET3_R, 270, 90)
            Line((6.3499, FILLET3_R), (6.3499, 0))
            Line((6.3499, 0), (6.3499 - FILLET3_R, 0))
        make_face()
    revolve(axis=Axis((25.4001, 12.7, 6.3499), (0, -1, 0)), revolution_arc=90, mode=Mode.SUBTRACT)
    with BuildSketch(Plane(origin=(25.4001, 12.7, 12.7), x_dir=(0, 0, -1), z_dir=(-1, 0, 0))) as fillet3_3_piece_6:
        with BuildLine():
            CenterArc((FILLET3_R, FILLET3_R), FILLET3_R, 180, 90)
            Line((0, FILLET3_R), (0, 0))
            Line((0, 0), (FILLET3_R, 0))
        make_face()
    extrude(amount=4.470259687, mode=Mode.SUBTRACT)
    with BuildSketch(Plane(origin=(31.75, 12.7, 6.3499), x_dir=(-1, 0, 0), z_dir=(0, 0, 1))) as fillet3_3_piece_7:
        with BuildLine():
            CenterArc((FILLET3_R, FILLET3_R), FILLET3_R, 180, 90)
            Line((0, FILLET3_R), (0, 0))
            Line((0, 0), (FILLET3_R, 0))
        make_face()
    extrude(amount=0.0002, mode=Mode.SUBTRACT)
    with BuildSketch(Plane(origin=(25.4001, 12.7, 6.3501), x_dir=(0, 0, 1), z_dir=(-1, 0, 0))) as fillet3_3_piece_8:
        with BuildLine():
            CenterArc((6.3499 - FILLET3_R, -FILLET3_R), FILLET3_R, 0, 90)
            Line((6.3499, -FILLET3_R), (6.3499, 0))
            Line((6.3499, 0), (6.3499 - FILLET3_R, 0))
        make_face()
    revolve(axis=Axis((25.4001, 12.7, 6.3501), (0, 1, 0)), revolution_arc=90, mode=Mode.SUBTRACT)
    with BuildSketch(Plane(origin=(17.4752, 48.4952, 2), x_dir=(0, 0, -1), z_dir=(0, -1, 0))) as fillet3_3_piece_9:
        with BuildLine():
            CenterArc((2 - FILLET3_R, -FILLET3_R), FILLET3_R, 0, 90)
            Line((2 - FILLET3_R, 0), (2, 0))
            Line((2, 0), (2, -FILLET3_R))
        make_face()
    revolve(axis=Axis((17.4752, 48.4952, 2), (1, 0, 0)), revolution_arc=90, mode=Mode.SUBTRACT)
    with BuildSketch(Plane(origin=(20.929840313, 14.7, 12.7), x_dir=(0, -1, 0), z_dir=(1, 0, 0))) as fillet3_3_piece_10:
        with BuildLine():
            CenterArc((2 + FILLET3_R, FILLET3_R), FILLET3_R, 180, 90)
            Line((2 + FILLET3_R, 0), (2, 0))
            Line((2, 0), (2, FILLET3_R))
        make_face()
    revolve(axis=Axis((20.929840313, 14.7, 12.7), (0, 0, -1)), revolution_arc=86.45220293, mode=Mode.SUBTRACT)
    with BuildSketch(Plane(origin=(17.4752, 50.4952, 2), x_dir=(0, -1, 0), z_dir=(0, 0, 1))) as fillet3_3_piece_11:
        with BuildLine():
            CenterArc((FILLET3_R, -FILLET3_R), FILLET3_R, 90, 90)
            Line((0, -FILLET3_R), (0, 0))
            Line((0, 0), (FILLET3_R, 0))
        make_face()
    extrude(amount=8.7, mode=Mode.SUBTRACT)
    with BuildSketch(Plane(origin=(17.4752, 48.4952, 10.7), x_dir=(0, 0, 1), z_dir=(0, -1, 0))) as fillet3_3_piece_12:
        with BuildLine():
            CenterArc((2 - FILLET3_R, FILLET3_R), FILLET3_R, 270, 90)
            Line((2, FILLET3_R), (2, 0))
            Line((2, 0), (2 - FILLET3_R, 0))
        make_face()
    revolve(axis=Axis((17.4752, 48.4952, 10.7), (-1, 0, 0)), revolution_arc=90, mode=Mode.SUBTRACT)
    with BuildSketch(Plane(origin=(18.4752, 38.130970266, 12.7), x_dir=(-1, 0, 0), z_dir=(0, 1, 0))) as fillet3_3_piece_13:
        with BuildLine():
            CenterArc((1 + FILLET3_R, -FILLET3_R), FILLET3_R, 90, 90)
            Line((1 + FILLET3_R, 0), (1, 0))
            Line((1, 0), (1, -FILLET3_R))
        make_face()
    revolve(axis=Axis((18.4752, 38.130970266, 12.7), (0, 0, 1)), revolution_arc=3.54779707, mode=Mode.SUBTRACT)
    with BuildSketch(Plane(origin=(18.4752, 38.130970266, 0), x_dir=(-1, 0, 0), z_dir=(0, 1, 0))) as fillet3_3_piece_14:
        with BuildLine():
            CenterArc((1 + FILLET3_R, FILLET3_R), FILLET3_R, 180, 90)
            Line((1, FILLET3_R), (1, 0))
            Line((1, 0), (1 + FILLET3_R, 0))
        make_face()
    revolve(axis=Axis((18.4752, 38.130970266, 0), (0, 0, 1)), revolution_arc=3.54779707, mode=Mode.SUBTRACT)


solid = part.part
